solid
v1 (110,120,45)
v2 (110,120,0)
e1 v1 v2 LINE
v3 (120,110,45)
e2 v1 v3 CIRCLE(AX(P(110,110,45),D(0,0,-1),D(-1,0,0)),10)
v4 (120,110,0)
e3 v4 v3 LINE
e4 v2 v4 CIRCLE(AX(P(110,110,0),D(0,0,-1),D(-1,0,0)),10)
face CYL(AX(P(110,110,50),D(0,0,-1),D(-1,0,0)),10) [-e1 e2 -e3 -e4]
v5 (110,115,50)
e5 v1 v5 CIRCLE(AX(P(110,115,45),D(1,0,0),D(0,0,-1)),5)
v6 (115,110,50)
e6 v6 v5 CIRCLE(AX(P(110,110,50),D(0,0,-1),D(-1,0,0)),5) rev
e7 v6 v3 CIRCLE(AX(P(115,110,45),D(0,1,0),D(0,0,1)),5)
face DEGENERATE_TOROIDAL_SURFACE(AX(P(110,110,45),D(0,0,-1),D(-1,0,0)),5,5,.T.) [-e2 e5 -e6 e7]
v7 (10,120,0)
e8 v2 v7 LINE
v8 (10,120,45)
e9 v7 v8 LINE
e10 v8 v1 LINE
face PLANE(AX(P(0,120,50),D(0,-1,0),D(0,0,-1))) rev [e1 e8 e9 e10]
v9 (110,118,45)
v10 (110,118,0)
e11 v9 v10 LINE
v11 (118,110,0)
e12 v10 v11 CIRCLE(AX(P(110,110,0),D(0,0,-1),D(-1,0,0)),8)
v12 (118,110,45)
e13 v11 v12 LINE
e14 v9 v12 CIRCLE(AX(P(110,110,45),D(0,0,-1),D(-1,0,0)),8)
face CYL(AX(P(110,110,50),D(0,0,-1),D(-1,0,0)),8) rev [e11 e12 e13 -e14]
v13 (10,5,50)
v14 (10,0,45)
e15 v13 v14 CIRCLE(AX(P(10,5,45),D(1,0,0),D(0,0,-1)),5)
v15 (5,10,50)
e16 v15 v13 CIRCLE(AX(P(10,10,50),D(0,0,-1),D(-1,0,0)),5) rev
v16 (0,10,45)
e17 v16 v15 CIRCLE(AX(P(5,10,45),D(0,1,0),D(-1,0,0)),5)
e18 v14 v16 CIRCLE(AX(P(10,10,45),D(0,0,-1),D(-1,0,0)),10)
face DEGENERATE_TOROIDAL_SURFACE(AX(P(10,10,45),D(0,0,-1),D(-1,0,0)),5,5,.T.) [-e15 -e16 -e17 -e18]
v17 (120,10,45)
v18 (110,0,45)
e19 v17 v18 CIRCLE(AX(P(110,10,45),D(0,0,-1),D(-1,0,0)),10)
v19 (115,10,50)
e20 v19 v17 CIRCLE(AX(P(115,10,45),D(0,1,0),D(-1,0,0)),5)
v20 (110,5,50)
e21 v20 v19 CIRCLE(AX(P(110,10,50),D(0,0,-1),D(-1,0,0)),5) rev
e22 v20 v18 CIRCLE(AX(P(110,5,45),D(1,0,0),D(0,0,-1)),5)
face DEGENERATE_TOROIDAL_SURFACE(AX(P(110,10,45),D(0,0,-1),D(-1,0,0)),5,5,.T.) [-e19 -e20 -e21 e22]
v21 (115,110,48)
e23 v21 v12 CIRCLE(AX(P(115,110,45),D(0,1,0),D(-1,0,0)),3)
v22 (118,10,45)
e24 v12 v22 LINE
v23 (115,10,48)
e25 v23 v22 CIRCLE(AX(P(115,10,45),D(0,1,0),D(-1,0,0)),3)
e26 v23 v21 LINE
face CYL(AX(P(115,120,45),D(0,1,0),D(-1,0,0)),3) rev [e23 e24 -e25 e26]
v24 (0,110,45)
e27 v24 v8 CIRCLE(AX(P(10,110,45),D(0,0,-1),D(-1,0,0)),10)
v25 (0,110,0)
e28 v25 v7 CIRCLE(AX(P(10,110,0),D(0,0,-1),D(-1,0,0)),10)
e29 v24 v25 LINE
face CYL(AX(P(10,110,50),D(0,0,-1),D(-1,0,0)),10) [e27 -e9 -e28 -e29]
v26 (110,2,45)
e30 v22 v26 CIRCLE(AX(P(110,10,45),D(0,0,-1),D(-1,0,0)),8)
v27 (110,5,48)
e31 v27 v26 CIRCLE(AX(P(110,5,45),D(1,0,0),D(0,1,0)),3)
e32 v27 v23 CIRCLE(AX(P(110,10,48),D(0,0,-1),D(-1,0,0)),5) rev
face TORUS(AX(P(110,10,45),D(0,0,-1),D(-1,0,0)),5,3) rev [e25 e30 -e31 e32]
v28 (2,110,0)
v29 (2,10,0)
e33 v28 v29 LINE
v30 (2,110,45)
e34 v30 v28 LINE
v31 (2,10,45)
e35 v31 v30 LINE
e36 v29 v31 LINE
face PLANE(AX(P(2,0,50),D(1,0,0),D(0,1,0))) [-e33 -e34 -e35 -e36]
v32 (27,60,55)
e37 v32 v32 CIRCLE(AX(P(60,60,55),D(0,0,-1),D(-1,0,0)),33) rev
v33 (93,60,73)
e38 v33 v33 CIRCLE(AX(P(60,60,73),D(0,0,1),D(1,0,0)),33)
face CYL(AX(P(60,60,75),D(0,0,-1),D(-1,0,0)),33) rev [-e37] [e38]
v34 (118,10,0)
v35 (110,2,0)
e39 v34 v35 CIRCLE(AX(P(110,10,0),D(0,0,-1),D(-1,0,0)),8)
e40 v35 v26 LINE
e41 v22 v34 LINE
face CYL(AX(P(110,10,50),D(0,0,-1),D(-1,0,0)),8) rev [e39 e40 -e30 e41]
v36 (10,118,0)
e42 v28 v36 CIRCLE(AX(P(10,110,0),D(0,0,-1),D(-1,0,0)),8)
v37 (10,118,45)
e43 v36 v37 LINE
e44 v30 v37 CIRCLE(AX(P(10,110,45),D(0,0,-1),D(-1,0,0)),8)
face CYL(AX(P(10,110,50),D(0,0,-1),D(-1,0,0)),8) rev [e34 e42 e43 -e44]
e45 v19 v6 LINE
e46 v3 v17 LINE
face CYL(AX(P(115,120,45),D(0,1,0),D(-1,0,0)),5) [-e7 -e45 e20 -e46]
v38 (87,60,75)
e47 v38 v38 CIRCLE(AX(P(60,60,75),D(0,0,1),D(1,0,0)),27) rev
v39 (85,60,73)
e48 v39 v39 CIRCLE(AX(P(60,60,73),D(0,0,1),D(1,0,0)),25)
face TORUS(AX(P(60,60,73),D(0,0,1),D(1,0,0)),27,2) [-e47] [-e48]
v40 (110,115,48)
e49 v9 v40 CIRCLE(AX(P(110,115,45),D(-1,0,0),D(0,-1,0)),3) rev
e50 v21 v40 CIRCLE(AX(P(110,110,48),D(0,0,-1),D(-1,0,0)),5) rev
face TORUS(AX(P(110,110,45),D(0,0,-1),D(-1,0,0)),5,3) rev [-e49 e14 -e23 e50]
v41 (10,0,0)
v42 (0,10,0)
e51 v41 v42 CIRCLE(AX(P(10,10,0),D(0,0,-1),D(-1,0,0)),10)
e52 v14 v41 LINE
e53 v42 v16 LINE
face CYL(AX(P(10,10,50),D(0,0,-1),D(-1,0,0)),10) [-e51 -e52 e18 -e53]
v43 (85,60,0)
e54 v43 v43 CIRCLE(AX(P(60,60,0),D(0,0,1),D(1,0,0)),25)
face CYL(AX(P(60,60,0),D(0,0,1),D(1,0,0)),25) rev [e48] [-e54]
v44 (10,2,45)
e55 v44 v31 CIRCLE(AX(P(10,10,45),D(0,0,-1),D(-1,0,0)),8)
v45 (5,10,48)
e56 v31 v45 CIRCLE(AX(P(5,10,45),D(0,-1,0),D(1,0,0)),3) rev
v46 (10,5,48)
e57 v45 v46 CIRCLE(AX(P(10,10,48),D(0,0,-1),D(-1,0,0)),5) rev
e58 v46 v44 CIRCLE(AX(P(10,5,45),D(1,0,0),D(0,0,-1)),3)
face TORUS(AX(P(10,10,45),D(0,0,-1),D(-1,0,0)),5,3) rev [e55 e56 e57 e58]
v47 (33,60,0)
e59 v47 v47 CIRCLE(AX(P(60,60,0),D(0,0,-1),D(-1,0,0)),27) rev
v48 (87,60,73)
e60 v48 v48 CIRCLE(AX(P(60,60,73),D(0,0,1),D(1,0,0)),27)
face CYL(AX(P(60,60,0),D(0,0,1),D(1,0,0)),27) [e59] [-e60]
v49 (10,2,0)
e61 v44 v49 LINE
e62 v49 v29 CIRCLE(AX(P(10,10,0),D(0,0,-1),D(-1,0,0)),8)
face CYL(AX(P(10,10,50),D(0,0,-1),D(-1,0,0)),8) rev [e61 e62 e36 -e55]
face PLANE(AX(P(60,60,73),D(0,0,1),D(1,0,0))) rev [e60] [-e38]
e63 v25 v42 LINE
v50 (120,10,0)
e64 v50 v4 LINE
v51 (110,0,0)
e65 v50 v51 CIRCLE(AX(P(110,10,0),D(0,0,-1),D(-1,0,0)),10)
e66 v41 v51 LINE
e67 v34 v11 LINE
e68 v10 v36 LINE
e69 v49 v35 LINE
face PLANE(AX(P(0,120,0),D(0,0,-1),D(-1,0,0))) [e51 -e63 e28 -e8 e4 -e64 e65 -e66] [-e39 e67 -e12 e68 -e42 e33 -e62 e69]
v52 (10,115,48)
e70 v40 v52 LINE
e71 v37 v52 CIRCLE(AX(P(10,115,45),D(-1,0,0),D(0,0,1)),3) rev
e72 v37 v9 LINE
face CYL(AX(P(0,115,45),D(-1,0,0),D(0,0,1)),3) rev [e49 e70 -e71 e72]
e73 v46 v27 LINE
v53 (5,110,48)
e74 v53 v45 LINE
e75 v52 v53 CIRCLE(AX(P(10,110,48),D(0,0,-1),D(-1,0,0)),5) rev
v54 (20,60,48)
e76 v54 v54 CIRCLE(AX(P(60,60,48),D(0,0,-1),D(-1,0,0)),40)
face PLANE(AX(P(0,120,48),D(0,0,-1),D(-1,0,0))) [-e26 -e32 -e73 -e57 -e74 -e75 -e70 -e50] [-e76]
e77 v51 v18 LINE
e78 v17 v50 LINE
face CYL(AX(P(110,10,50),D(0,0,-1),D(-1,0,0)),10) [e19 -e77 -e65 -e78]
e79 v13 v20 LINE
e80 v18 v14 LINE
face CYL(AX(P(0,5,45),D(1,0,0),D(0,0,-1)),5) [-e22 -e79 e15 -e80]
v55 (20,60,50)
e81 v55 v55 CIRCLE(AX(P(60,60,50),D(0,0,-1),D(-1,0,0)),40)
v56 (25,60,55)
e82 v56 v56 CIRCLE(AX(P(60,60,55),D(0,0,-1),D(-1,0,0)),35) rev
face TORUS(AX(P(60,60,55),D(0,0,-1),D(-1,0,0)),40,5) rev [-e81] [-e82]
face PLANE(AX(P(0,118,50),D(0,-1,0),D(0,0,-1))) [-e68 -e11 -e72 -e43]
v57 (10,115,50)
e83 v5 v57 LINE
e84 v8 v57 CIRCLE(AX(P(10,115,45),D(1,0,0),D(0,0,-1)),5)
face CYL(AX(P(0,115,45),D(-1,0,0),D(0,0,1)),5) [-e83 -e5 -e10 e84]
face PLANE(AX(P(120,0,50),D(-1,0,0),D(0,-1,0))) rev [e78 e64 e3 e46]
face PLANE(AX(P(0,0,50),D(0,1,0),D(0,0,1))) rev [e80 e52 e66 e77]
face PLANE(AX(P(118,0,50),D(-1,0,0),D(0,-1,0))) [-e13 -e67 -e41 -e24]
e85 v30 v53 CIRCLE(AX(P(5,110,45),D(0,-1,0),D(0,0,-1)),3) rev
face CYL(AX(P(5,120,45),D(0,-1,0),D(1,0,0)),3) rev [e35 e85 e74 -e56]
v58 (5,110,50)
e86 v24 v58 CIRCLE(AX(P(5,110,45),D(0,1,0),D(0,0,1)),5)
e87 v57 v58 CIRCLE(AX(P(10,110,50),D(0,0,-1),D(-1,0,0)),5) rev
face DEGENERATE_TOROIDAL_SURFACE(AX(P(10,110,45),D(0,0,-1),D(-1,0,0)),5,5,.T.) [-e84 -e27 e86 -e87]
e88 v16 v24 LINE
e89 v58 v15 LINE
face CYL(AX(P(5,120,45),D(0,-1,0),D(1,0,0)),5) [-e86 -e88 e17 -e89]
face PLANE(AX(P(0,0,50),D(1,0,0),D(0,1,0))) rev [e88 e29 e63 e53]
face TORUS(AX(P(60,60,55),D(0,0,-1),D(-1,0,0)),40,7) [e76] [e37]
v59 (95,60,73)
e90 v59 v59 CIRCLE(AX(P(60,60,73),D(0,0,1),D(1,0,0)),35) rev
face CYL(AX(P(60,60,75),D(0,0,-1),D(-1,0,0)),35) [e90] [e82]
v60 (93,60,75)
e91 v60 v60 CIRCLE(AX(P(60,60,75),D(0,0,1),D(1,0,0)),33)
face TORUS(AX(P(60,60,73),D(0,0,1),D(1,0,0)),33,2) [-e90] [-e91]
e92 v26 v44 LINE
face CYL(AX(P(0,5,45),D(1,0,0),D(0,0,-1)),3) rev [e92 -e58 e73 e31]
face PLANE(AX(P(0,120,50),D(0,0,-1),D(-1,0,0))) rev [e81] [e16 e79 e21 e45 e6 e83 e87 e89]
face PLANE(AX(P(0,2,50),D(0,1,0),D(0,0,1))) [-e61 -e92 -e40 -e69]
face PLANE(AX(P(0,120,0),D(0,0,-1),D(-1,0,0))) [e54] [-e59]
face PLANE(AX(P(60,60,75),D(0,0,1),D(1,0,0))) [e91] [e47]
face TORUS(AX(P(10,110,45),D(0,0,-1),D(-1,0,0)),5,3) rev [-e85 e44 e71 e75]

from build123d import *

# Parameters (mm, degrees)
SKETCH1_W          = 120
SKETCH1_H          = 120
EXTRUDE1_DEPTH     = 50
SKETCH2_R          = 35
EXTRUDE2_DEPTH     = 25
SKETCH3_R          = 25
CUT_EXTRUDE1_DEPTH = 186.539753153
FILLET1_R          = 10
FILLET2_R          = 5
FILLET3_R          = 2
SHELL1_T           = -2


with BuildPart() as part:
    # Sketch1 → Extrude1 (new body)
    with BuildSketch(Plane.XY):
        with Locations((60, 60)):
            Rectangle(SKETCH1_W, SKETCH1_H)
    extrude(amount=EXTRUDE1_DEPTH)

    # Sketch2 → Extrude2 (add)
    with BuildSketch(Plane.XY.offset(50)):
        with Locations(Location((60, 60, 0), (0, 0, 180))):
            Circle(SKETCH2_R)
    extrude(amount=EXTRUDE2_DEPTH)

    # Sketch3 → Cut-Extrude1 (cut, through all)
    with BuildSketch(Plane.XY.offset(75)):
        with Locations((60, 60)):
            Circle(SKETCH3_R)
    extrude(amount=-CUT_EXTRUDE1_DEPTH, mode=Mode.SUBTRACT)

    # Fillet1
    fillet1_edges = [part.edges().sort_by_distance(p)[0] for p in [
        (0, 120, 25),
        (120, 120, 25),
        (120, 0, 25),
        (0, 0, 25),
    ]]
    fillet(fillet1_edges, radius=FILLET1_R)

    # Fillet2
    fillet2_edges = [part.edges().sort_by_distance(p)[0] for p in [
        (95, 60, 50),
        (0, 60, 50),
        (60, 120, 50),
        (60, 0, 50),
        (120, 60, 50),
        (2.928932188, 2.928932188, 50),
        (117.071067812, 2.928932188, 50),
        (117.071067812, 117.071067812, 50),
        (2.928932188, 117.071067812, 50),
    ]]
    fillet(fillet2_edges, radius=FILLET2_R)

    # Fillet3
    fillet3_edges = [part.edges().sort_by_distance(p)[0] for p in [
        (95, 60, 75),
        (35, 60, 75),
    ]]
    fillet(fillet3_edges, radius=FILLET3_R)

    # Shell1
    shell1_openings = [part.faces().sort_by_distance(p)[0] for p in [
        (60, 1.697056275, 0),
    ]]
    offset(amount=SHELL1_T, openings=shell1_openings, kind=Kind.INTERSECTION)


solid = part.part
